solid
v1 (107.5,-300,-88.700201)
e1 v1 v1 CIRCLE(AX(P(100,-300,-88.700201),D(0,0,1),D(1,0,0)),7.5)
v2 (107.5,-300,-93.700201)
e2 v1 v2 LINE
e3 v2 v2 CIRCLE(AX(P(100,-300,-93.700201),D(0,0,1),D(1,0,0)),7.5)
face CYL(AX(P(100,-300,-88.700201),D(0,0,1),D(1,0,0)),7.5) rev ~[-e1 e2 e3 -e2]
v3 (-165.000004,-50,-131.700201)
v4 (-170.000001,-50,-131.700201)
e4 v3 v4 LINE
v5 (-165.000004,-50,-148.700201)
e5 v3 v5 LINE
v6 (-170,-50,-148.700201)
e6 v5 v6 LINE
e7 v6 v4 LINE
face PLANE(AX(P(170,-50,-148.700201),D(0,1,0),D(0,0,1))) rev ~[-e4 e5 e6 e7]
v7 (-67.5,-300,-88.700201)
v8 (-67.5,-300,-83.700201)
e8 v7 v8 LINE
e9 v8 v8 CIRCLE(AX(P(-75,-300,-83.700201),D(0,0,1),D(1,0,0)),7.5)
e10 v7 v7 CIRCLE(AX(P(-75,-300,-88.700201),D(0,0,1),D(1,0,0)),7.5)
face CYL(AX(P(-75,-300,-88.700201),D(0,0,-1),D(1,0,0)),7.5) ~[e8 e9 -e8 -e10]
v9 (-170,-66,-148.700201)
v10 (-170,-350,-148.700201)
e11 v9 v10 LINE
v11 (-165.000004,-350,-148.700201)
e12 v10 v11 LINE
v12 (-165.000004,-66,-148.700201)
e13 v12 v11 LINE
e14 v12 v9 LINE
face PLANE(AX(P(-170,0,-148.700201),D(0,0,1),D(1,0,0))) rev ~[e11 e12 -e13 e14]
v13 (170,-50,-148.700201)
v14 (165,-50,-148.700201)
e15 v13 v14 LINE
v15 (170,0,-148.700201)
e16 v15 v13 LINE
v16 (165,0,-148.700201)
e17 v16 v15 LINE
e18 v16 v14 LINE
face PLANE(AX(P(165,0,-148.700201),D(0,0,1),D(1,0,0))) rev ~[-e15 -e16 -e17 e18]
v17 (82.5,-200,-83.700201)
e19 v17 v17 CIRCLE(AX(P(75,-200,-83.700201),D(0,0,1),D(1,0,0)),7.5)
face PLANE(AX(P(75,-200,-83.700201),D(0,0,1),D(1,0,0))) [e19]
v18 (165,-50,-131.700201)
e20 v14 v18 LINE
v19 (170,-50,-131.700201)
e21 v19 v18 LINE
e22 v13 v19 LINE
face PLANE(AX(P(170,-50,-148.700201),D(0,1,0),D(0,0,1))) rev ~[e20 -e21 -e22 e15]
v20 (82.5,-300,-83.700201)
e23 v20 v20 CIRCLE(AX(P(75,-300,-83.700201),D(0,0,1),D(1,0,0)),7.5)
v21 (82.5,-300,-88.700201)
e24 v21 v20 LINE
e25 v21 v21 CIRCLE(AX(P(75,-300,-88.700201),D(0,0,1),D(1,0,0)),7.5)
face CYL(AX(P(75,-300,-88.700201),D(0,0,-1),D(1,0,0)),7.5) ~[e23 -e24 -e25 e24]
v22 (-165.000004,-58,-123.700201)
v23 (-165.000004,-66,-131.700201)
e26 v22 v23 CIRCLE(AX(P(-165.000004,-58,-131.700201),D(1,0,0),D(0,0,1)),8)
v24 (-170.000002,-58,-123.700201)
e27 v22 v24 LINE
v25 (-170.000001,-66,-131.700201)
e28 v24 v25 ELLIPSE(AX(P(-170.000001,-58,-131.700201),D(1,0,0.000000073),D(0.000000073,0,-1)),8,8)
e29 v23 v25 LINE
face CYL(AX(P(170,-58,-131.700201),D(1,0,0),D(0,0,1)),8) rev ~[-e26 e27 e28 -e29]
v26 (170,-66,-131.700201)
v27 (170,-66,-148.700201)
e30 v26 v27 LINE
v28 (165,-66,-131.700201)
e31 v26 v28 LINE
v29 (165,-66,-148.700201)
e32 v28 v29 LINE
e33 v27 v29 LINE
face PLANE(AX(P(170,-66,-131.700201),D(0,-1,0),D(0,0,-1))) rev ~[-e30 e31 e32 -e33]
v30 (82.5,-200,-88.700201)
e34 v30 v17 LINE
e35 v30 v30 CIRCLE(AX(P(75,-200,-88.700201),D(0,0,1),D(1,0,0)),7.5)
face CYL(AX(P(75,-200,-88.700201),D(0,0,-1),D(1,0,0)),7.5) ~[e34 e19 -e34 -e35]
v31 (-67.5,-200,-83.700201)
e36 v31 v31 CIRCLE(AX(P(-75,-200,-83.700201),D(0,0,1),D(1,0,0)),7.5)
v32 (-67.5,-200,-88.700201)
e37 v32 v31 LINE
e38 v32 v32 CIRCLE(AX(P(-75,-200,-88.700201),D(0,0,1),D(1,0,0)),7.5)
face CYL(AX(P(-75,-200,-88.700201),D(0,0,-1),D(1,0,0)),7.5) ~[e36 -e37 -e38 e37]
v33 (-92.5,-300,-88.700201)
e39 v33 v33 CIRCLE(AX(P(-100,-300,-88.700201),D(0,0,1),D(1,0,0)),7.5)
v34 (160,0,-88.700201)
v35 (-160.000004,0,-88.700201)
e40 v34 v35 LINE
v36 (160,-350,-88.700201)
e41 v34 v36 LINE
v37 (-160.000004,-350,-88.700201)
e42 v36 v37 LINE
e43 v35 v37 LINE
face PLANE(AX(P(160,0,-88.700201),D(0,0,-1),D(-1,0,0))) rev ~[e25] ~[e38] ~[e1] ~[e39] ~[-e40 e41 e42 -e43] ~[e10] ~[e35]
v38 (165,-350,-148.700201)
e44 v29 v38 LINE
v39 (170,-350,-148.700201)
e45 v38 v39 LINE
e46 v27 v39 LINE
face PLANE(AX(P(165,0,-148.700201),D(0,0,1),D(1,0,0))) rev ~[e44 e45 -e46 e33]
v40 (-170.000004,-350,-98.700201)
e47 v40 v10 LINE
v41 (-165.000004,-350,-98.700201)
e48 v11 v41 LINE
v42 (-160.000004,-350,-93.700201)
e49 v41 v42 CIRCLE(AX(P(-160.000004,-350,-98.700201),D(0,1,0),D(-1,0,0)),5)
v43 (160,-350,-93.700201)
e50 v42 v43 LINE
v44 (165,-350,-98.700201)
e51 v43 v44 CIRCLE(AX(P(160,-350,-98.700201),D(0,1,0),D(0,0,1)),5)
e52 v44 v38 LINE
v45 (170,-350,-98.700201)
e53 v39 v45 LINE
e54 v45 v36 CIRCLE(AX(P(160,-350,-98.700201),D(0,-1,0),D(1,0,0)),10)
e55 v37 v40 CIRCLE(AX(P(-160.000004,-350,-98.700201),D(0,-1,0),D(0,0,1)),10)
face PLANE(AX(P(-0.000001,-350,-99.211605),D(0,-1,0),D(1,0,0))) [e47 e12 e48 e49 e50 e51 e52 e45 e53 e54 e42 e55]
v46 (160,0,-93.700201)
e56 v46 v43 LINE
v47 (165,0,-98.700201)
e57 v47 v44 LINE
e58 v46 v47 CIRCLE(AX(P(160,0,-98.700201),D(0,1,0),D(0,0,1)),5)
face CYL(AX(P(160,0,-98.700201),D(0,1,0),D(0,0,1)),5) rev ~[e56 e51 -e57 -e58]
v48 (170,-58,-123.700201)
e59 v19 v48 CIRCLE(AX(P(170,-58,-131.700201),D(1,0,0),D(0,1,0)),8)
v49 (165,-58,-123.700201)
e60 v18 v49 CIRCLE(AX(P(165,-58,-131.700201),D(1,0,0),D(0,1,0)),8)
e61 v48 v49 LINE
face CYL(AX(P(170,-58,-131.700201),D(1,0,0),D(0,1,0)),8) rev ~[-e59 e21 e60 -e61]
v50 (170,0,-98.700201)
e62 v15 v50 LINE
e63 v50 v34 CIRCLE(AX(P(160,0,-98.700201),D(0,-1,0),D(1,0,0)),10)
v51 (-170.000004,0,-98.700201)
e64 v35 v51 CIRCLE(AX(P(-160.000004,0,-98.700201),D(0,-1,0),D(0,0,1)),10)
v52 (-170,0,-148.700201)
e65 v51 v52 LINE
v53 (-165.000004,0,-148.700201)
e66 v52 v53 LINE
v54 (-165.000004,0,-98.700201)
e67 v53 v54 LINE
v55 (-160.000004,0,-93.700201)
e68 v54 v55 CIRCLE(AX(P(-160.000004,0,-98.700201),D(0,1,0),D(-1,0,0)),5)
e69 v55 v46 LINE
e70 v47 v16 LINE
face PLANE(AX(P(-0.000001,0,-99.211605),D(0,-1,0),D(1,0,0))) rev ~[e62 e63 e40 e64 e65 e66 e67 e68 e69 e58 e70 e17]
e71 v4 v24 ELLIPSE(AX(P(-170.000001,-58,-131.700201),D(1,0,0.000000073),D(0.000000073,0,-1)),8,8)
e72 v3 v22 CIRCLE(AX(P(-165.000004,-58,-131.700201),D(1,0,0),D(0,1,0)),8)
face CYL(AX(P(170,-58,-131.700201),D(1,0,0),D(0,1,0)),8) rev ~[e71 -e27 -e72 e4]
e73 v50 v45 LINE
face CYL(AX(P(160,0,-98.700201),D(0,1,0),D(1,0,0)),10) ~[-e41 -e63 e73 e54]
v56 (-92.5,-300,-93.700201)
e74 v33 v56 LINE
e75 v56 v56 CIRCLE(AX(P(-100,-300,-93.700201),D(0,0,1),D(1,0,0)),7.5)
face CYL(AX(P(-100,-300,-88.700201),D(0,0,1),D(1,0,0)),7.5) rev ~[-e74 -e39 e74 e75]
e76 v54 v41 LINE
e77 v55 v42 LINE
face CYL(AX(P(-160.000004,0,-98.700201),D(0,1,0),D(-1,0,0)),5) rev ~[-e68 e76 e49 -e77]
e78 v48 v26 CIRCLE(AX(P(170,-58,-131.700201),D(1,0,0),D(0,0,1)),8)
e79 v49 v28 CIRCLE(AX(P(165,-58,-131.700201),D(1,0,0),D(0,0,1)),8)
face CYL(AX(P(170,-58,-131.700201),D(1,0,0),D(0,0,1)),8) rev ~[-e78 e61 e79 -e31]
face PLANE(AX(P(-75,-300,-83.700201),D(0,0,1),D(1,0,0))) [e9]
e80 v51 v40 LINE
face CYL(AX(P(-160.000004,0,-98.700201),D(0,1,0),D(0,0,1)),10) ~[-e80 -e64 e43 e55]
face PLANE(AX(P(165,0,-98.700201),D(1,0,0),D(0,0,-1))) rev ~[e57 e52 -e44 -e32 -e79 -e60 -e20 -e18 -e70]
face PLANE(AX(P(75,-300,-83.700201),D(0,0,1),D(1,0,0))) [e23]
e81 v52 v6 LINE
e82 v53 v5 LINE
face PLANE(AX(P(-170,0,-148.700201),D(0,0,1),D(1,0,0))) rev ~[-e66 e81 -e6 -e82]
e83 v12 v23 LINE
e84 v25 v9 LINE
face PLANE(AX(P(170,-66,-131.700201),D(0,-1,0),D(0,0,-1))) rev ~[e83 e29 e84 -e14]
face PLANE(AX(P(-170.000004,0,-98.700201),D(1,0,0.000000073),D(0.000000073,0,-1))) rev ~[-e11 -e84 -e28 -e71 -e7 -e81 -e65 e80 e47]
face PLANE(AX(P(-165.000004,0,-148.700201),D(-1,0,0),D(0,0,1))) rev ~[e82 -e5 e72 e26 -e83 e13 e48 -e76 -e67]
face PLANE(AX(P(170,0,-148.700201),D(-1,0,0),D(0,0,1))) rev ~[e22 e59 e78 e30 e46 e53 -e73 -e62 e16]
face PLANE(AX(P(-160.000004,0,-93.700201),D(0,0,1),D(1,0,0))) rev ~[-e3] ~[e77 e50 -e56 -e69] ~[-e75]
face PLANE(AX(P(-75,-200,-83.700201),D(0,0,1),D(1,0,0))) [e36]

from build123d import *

# Parameters (mm, degrees)
F1_DEPTH = 350
F3_DEPTH = 340.0010036672
F4_R     = 7.5
F5_DEPTH = 5
F6_R     = 7.5
F7_DEPTH = 5


# Not quite as in the source:
# - ends of sketch curves that miss each other by under 0.0002 mm in the source are joined


with BuildPart() as f1:
    # F0 (on Front) → F1 (new body)
    with BuildSketch(Plane.XZ):
        with BuildLine():
            Line((160, -88.7002011906), (-160.0000036672, -88.7002011906))
            ThreePointArc((-160.0000036672, -88.7002011906), (-167.0710714791, -91.6291333788), (-170.0000036672, -98.7002011906))
            Line((-170.0000036672, -98.7002011906), (-170, -148.7002011906))
            Line((-170, -148.7002011906), (-165.0000036672, -148.7002011906))
            Line((-165.0000036672, -148.7002011906), (-165.0000036672, -98.7002011906))
            ThreePointArc((-165.0000036672, -98.7002011906), (-163.5355375731, -95.1646672847), (-160.0000036672, -93.7002011906))
            Line((-160.0000036672, -93.7002011906), (160, -93.7002011906))
            ThreePointArc((160, -93.7002011906), (163.5355339059, -95.1646672847), (165, -98.7002011906))
            Line((165, -98.7002011906), (165, -148.7002011906))
            Line((165, -148.7002011906), (170, -148.7002011906))
            Line((170, -148.7002011906), (170, -98.7002011906))
            ThreePointArc((170, -98.7002011906), (167.0710678119, -91.6291333788), (160, -88.7002011906))
        make_face()
    extrude(amount=F1_DEPTH)

    # F2 (on face) → F3 (cut, through all)
    with BuildSketch(Plane.YZ.offset(170)):
        with BuildLine():
            Line((-66, -148.7002011906), (-50, -148.7002011906))
            Line((-50, -148.7002011906), (-50, -131.7002011906))
            ThreePointArc((-50, -131.7002011906), (-52.3431457505, -126.0433469411), (-58, -123.7002011906))
            ThreePointArc((-58, -123.7002011906), (-63.6568542495, -126.0433469411), (-66, -131.7002011906))
            Line((-66, -131.7002011906), (-66, -148.7002011906))
        make_face()
    extrude(amount=-F3_DEPTH, mode=Mode.SUBTRACT)

    # F4 (on face) → F5 (cut, through all)
    with BuildSketch(Plane.XY.offset(-88.7002011906)):
        with Locations((-100, -300)):
            Circle(F4_R)
        with Locations((100, -300)):
            Circle(F4_R)
    extrude(amount=-F5_DEPTH, mode=Mode.SUBTRACT)

    # F6 (on face) → F7 (join)
    with BuildSketch(Plane.XY.offset(-88.7002011906)):
        with Locations((-75, -200)):
            Circle(F6_R)
        with Locations((-75, -300)):
            Circle(F6_R)
        with Locations((75, -300)):
            Circle(F6_R)
        with Locations((75, -200)):
            Circle(F6_R)
    extrude(amount=F7_DEPTH)


solid = f1.part
